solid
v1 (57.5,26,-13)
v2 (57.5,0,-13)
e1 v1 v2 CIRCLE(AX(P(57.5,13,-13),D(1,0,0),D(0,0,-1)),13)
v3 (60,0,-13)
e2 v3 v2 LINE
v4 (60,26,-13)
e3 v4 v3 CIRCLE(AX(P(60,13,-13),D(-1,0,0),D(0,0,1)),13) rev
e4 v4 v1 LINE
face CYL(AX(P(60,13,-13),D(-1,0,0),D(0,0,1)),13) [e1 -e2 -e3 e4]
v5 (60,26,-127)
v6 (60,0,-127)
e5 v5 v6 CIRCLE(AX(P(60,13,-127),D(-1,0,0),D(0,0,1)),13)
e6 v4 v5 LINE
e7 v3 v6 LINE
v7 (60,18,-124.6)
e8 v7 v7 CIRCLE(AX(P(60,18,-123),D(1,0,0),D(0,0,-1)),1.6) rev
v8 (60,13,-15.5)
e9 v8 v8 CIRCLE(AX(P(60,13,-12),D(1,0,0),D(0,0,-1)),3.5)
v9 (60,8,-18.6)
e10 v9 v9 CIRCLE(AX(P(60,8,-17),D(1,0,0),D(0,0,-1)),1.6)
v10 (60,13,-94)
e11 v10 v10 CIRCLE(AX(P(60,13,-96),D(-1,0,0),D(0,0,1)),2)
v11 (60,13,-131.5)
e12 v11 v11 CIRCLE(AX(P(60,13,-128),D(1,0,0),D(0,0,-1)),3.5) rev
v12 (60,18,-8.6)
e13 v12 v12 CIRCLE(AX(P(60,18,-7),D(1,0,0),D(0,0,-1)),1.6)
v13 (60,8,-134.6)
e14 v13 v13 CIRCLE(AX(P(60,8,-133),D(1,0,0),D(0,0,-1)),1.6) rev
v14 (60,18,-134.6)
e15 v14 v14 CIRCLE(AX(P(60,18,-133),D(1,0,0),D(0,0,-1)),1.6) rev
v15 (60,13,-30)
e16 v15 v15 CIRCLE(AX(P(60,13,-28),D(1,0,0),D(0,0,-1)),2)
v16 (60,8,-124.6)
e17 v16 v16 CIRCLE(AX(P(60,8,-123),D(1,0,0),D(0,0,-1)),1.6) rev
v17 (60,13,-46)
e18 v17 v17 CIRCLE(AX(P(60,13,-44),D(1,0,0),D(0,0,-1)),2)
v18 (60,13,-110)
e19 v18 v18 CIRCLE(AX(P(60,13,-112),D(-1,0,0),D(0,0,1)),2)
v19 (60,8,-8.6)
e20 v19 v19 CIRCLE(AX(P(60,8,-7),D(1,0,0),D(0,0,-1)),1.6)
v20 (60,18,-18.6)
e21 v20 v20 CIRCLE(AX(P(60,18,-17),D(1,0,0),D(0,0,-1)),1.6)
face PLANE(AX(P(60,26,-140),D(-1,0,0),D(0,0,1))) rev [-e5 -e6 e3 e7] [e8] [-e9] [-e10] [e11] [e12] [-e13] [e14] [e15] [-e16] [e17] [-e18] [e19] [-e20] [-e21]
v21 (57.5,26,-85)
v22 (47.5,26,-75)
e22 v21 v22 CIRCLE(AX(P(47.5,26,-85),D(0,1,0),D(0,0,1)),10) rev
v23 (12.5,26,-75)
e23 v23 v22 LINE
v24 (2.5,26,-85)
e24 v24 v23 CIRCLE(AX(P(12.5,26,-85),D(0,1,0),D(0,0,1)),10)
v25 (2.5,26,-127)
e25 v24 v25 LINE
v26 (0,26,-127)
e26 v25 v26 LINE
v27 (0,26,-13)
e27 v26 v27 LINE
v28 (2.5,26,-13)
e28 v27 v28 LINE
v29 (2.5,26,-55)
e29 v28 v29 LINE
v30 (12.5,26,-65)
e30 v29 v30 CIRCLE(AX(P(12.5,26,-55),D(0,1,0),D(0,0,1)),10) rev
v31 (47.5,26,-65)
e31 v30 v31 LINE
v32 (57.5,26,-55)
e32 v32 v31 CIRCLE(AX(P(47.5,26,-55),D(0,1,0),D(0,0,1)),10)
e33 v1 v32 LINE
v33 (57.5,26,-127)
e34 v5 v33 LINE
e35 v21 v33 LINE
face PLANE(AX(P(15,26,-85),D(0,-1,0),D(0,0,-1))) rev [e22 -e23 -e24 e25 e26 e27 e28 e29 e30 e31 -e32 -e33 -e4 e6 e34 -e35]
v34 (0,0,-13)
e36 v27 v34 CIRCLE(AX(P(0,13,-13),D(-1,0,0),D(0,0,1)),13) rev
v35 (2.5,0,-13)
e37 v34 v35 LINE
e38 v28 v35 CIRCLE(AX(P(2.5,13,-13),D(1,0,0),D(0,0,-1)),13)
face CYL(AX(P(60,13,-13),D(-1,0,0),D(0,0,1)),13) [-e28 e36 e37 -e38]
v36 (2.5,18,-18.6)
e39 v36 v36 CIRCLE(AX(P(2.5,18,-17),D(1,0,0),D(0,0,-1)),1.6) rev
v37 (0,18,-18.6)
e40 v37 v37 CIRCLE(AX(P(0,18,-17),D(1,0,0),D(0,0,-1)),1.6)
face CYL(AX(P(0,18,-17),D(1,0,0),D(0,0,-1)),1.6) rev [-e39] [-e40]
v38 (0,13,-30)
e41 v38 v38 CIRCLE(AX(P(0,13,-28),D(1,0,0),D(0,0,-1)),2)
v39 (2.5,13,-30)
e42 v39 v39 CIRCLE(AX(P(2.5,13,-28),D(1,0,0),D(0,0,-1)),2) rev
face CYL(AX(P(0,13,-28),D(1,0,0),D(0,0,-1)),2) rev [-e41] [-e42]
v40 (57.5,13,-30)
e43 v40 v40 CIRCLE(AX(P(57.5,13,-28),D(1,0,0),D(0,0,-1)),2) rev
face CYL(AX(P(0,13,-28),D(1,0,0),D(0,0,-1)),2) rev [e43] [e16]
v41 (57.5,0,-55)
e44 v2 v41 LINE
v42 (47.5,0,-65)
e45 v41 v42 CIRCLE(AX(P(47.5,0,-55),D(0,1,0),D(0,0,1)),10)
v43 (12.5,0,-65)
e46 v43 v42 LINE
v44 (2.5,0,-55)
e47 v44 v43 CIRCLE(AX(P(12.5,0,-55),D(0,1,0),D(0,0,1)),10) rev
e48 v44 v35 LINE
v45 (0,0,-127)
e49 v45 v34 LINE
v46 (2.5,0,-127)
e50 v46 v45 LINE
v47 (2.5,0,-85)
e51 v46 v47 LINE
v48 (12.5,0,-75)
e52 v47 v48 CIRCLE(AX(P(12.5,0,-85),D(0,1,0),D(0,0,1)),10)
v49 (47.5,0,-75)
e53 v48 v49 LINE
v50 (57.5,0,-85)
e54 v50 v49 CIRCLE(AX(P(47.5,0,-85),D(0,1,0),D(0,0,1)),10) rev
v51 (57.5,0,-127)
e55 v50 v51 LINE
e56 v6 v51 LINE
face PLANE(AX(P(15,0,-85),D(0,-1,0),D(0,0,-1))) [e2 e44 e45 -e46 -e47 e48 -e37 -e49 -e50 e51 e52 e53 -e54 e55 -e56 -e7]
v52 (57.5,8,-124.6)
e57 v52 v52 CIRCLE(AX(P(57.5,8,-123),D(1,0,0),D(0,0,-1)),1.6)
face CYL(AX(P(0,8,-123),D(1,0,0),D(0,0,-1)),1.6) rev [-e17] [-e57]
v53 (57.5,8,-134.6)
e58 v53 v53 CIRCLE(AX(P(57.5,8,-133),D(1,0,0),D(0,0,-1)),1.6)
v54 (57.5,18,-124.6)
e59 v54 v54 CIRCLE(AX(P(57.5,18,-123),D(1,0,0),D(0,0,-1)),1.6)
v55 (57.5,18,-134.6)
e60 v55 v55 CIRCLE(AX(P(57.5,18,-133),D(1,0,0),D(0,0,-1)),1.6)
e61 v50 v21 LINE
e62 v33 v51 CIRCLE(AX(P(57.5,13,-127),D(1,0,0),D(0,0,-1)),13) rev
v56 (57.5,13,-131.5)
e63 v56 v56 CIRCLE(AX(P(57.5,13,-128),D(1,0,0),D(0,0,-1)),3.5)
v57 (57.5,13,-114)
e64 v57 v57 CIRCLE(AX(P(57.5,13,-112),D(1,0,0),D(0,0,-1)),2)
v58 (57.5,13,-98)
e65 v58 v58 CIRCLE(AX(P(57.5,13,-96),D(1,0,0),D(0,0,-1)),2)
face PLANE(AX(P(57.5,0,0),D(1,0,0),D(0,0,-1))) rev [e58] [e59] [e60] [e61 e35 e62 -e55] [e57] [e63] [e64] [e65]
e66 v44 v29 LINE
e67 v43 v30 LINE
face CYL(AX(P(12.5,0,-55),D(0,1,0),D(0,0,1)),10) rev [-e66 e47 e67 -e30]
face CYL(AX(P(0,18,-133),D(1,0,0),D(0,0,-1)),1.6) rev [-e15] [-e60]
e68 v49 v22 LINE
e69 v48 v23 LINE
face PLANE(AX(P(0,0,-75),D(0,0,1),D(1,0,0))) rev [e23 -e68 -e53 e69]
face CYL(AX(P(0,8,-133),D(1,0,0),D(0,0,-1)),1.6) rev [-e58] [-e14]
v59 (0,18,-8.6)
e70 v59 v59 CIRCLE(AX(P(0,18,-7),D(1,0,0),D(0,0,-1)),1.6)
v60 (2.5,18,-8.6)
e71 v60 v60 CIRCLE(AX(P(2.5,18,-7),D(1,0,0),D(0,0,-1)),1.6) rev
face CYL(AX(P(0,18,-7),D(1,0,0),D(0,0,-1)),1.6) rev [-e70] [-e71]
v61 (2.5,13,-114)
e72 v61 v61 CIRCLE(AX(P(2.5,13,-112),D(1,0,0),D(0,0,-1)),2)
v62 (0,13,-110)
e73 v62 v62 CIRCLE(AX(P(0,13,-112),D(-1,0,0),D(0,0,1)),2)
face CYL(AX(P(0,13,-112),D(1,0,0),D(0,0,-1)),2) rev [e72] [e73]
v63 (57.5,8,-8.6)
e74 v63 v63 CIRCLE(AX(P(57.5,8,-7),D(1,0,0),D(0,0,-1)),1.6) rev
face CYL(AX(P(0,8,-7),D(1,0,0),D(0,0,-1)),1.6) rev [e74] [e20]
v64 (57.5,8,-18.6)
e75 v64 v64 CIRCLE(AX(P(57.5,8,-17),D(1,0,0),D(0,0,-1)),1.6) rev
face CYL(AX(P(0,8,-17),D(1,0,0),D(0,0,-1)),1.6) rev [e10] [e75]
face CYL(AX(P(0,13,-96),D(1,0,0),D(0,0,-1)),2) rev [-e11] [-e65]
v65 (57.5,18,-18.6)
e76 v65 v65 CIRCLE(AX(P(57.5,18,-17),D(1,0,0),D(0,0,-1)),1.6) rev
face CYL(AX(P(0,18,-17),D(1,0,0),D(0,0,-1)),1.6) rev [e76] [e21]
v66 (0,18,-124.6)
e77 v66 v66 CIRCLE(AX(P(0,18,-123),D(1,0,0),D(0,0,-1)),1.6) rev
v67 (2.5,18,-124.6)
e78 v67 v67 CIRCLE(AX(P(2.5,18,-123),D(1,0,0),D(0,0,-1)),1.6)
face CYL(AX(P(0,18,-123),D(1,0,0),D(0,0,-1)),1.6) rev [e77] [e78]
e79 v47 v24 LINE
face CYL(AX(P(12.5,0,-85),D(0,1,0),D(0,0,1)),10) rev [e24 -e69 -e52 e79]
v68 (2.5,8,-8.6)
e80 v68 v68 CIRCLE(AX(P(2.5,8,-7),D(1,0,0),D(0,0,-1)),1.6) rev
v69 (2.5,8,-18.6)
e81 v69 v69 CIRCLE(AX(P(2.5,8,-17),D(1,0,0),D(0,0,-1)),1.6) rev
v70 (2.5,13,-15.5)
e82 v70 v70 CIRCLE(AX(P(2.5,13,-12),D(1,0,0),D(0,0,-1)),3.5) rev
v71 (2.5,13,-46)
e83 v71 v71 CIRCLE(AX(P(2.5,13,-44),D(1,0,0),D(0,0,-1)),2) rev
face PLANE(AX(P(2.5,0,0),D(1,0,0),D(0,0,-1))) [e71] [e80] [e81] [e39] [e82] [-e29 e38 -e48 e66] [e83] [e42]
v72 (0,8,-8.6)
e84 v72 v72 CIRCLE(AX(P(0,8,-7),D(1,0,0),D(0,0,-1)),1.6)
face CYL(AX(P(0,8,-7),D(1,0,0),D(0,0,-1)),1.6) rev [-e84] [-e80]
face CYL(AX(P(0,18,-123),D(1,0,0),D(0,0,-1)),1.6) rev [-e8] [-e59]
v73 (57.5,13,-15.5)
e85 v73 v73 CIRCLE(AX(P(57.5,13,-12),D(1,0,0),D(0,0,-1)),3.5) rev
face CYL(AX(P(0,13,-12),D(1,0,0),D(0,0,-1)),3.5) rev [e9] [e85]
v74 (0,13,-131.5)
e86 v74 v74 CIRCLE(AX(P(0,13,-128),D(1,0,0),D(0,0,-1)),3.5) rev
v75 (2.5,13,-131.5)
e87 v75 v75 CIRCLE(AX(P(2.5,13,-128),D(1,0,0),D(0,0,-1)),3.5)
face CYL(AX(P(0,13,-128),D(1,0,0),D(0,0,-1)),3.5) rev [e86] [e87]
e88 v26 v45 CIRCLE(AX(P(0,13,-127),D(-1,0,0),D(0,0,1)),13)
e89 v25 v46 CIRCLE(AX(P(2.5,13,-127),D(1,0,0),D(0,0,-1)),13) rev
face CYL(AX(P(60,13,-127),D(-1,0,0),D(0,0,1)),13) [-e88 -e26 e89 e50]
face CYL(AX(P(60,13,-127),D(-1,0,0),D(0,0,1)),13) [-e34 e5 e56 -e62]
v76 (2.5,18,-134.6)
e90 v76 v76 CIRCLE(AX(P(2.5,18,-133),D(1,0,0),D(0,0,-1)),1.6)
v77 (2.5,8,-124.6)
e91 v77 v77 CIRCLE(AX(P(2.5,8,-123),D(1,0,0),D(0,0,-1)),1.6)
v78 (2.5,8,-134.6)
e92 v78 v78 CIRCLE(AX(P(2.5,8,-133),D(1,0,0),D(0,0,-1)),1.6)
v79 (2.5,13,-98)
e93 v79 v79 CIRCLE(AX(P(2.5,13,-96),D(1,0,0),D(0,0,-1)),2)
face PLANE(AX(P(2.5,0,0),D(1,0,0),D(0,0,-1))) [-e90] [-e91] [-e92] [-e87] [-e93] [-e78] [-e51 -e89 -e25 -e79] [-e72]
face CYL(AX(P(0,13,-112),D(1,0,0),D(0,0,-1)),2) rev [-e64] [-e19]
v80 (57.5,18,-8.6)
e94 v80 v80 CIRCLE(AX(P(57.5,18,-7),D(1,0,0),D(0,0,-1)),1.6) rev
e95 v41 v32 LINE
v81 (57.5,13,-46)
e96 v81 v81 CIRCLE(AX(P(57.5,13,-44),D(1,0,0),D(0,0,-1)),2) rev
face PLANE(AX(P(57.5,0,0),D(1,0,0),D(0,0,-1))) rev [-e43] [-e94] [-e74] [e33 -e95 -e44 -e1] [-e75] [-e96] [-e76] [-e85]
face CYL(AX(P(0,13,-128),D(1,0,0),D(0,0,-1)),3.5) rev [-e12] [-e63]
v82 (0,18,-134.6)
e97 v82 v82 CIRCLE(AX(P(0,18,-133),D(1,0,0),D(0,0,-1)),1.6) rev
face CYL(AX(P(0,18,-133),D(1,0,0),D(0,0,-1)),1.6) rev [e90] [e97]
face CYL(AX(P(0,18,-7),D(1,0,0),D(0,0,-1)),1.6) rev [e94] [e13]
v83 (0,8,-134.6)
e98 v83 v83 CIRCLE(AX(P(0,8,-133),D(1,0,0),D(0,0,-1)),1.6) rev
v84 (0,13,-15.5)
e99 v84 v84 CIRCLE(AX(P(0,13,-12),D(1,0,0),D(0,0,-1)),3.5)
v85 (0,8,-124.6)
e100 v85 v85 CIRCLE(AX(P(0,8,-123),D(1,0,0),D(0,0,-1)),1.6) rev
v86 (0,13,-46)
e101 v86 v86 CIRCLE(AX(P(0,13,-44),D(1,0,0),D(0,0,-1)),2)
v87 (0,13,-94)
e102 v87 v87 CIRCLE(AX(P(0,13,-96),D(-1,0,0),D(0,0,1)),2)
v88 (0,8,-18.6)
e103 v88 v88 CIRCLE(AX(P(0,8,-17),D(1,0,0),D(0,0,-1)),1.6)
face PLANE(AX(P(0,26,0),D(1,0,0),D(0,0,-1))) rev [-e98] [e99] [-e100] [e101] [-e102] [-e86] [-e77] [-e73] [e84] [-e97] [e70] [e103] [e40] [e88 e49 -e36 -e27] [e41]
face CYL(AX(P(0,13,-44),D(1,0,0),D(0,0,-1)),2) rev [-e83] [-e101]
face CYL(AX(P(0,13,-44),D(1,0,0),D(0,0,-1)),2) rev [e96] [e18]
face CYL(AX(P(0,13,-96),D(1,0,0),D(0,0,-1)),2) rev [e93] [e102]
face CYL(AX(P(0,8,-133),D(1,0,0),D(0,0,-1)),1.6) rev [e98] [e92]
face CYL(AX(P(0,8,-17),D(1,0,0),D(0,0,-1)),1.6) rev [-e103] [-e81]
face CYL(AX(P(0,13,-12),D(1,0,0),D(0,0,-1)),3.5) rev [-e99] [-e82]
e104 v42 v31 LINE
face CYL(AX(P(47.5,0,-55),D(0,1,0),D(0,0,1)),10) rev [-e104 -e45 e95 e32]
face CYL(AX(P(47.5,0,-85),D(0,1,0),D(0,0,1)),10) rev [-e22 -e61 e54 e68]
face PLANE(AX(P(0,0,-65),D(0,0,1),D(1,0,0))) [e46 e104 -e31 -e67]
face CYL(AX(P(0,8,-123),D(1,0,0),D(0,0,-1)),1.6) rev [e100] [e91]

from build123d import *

# Parameters (mm, degrees)
EXTRUDE_1_DEPTH      = 26
SKETCH_2_R           = 2
SKETCH_2_R_2         = 3.5
SKETCH_2_R_3         = 1.6
CUT_EXTRUDE_2_DEPTH  = 155.518607294
CUT_EXTRUDE_5_DEPTH  = 155.518607294
SKETCH_5_R           = 10.5
CUT_EXTRUDE_6_DEPTH  = 1.6
CUT_EXTRUDE_START    = -1.6
SKETCH_6_R           = 10.5
CUT_EXTRUDE_7_DEPTH  = 1.6
SKETCH_7_R           = 10.5
CUT_EXTRUDE_8_DEPTH  = 1.6
SKETCH_8_R           = 10.5
CUT_EXTRUDE_9_DEPTH  = 1.6
SKETCH_9_W           = 55
SKETCH_9_H           = 54.794138709
CUT_EXTRUDE_11_DEPTH = 155.518607294
SKETCH_11_W          = 55
SKETCH_11_H          = 30.411722582
CUT_EXTRUDE_12_DEPTH = 155.518607294
EXTRUDE_2_DEPTH      = 26


with BuildPart() as part:
    # 草图1 → 凸台-拉伸1 (new body)
    with BuildSketch(Plane(origin=(0, 0, 0), x_dir=(1, 0, 0), z_dir=(0, 1, 0))):
        with BuildLine():
            Line((0, 0), (0, 140))
            Line((0, 140), (5, 140))
            Line((5, 140), (5, 85))
            ThreePointArc((5, 85), (7.928932188, 77.928932188), (15, 75))
            Line((15, 75), (45, 75))
            ThreePointArc((45, 75), (52.071067812, 77.928932188), (55, 85))
            Line((55, 85), (55, 140))
            Line((55, 140), (60, 140))
            Line((60, 140), (60, 0))
            Line((60, 0), (55, 0))
            Line((55, 0), (55, 55))
            ThreePointArc((55, 55), (52.071067812, 62.071067812), (45, 65))
            Line((45, 65), (15, 65))
            ThreePointArc((15, 65), (7.928932188, 62.071067812), (5, 55))
            Line((5, 55), (5, 0))
            Line((5, 0), (0, 0))
        make_face()
    extrude(amount=EXTRUDE_1_DEPTH)

    # 草图2 → 切除-拉伸2 (cut, through all)
    with BuildSketch(Plane(origin=(60, 0, 0), x_dir=(0, 0, -1), z_dir=(1, 0, 0))):
        with Locations((44, 13)):
            Circle(SKETCH_2_R)
        with Locations((28, 13)):
            Circle(SKETCH_2_R)
        with Locations((12, 13)):
            Circle(SKETCH_2_R_2)
        with Locations((7, 8)):
            Circle(SKETCH_2_R_3)
        with Locations((7, 18)):
            Circle(SKETCH_2_R_3)
        with Locations((17, 8)):
            Circle(SKETCH_2_R_3)
        with Locations((17, 18)):
            Circle(SKETCH_2_R_3)
        with Locations((96, 13)):
            Circle(SKETCH_2_R)
        with Locations((112, 13)):
            Circle(SKETCH_2_R)
        with Locations((123, 18)):
            Circle(SKETCH_2_R_3)
        with Locations((133, 18)):
            Circle(SKETCH_2_R_3)
        with Locations((133, 8)):
            Circle(SKETCH_2_R_3)
        with Locations((128, 13)):
            Circle(SKETCH_2_R_2)
        with Locations((123, 8)):
            Circle(SKETCH_2_R_3)
    extrude(amount=-CUT_EXTRUDE_2_DEPTH, mode=Mode.SUBTRACT)

    # 草图3 → 切除-拉伸5 (cut, through all)
    with BuildSketch(Plane.ZY):
        with BuildLine():
            Line((-127, 26), (-140, 26))
            Line((-140, 26), (-140, 13))
            ThreePointArc((-140, 13), (-136.192388155, 22.192388155), (-127, 26))
        make_face()
        with BuildLine():
            ThreePointArc((-127, 0), (-136.192388155, 3.807611845), (-140, 13))
            Line((-140, 13), (-140, 0))
            Line((-140, 0), (-127, 0))
        make_face()
        with BuildLine():
            Line((0, 26), (-13, 26))
            ThreePointArc((-13, 26), (-3.807611845, 22.192388155), (0, 13))
            Line((0, 13), (0, 26))
        make_face()
        with BuildLine():
            ThreePointArc((0, 13), (-3.807611845, 3.807611845), (-13, 0))
            Line((-13, 0), (0, 0))
            Line((0, 0), (0, 13))
        make_face()
    extrude(amount=-CUT_EXTRUDE_5_DEPTH, mode=Mode.SUBTRACT)

    # 草图5 → 切除-拉伸6 (cut)
    with BuildSketch(Plane.ZY.offset(-55)):
        with Locations((-128, 13)):
            Circle(SKETCH_5_R)
    extrude(amount=-CUT_EXTRUDE_6_DEPTH, mode=Mode.SUBTRACT)

    # 草图6 → 切除-拉伸7 (cut)
    with BuildSketch(Plane(origin=(5, 0, 0), x_dir=(0, 0, -1), z_dir=(1, 0, 0)).offset(CUT_EXTRUDE_START)):
        with Locations((128, 13)):
            Circle(SKETCH_6_R)
    extrude(amount=CUT_EXTRUDE_7_DEPTH, mode=Mode.SUBTRACT)

    # 草图7 → 切除-拉伸8 (cut)
    with BuildSketch(Plane.ZY.offset(-55)):
        with Locations((-12, 13)):
            Circle(SKETCH_7_R)
    extrude(amount=-CUT_EXTRUDE_8_DEPTH, mode=Mode.SUBTRACT)

    # 草图8 → 切除-拉伸9 (cut)
    with BuildSketch(Plane(origin=(5, 0, 0), x_dir=(0, 0, -1), z_dir=(1, 0, 0)).offset(CUT_EXTRUDE_START)):
        with Locations((12, 13)):
            Circle(SKETCH_8_R)
    extrude(amount=CUT_EXTRUDE_9_DEPTH, mode=Mode.SUBTRACT)

    # 草图9 → 切除-拉伸11 (cut, through all)
    with BuildSketch(Plane(origin=(0, 26, 0), x_dir=(1, 0, 0), z_dir=(0, 1, 0))):
        with Locations((30, 112.602930646)):
            Rectangle(SKETCH_9_W, SKETCH_9_H)
        with Locations((30, 27.397069355)):
            Rectangle(SKETCH_9_W, SKETCH_9_H)
    extrude(amount=-CUT_EXTRUDE_11_DEPTH, mode=Mode.SUBTRACT)

    # 草图11 → 切除-拉伸12 (cut, through all)
    with BuildSketch(Plane(origin=(0, 26, 0), x_dir=(1, 0, 0), z_dir=(0, 1, 0))):
        with Locations((30, 70)):
            Rectangle(SKETCH_11_W, SKETCH_11_H)
    extrude(amount=-CUT_EXTRUDE_12_DEPTH, mode=Mode.SUBTRACT)


with BuildPart() as cut_extrude_12_piece_1:
    # of the separate pieces the step leaves, piece 1, a body of its own (cut_extrude_12_pieces)
    add(part.part.solids().sort_by_distance((60, 0, -127))[0])



with BuildPart() as cut_extrude_12_piece_2:
    # of the separate pieces the step leaves, piece 2, a body of its own (cut_extrude_12_pieces)
    add(part.part.solids().sort_by_distance((0, 26, -127))[0])


with BuildPart() as cut_extrude_12_piece_1_1:
    add(cut_extrude_12_piece_1.part)

    add(cut_extrude_12_piece_2.part)  # 凸台-拉伸2 merges 切除-拉伸12 piece 2
    # 草图12 → 凸台-拉伸2 (add)
    with BuildSketch(Plane(origin=(0, 26, 0), x_dir=(1, 0, 0), z_dir=(0, 1, 0))):
        with BuildLine():
            ThreePointArc((2.5, 55), (5.428932188, 62.071067812), (12.5, 65))
            Line((12.5, 65), (47.5, 65))
            ThreePointArc((47.5, 65), (54.571067812, 62.071067812), (57.5, 55))
            Line((57.5, 55), (57.5, 85))
            ThreePointArc((57.5, 85), (54.571067812, 77.928932188), (47.5, 75))
            Line((47.5, 75), (12.5, 75))
            ThreePointArc((12.5, 75), (5.428932188, 77.928932188), (2.5, 85))
            Line((2.5, 85), (2.5, 55))
        make_face()
    extrude(amount=-EXTRUDE_2_DEPTH)


solid = cut_extrude_12_piece_1_1.part
